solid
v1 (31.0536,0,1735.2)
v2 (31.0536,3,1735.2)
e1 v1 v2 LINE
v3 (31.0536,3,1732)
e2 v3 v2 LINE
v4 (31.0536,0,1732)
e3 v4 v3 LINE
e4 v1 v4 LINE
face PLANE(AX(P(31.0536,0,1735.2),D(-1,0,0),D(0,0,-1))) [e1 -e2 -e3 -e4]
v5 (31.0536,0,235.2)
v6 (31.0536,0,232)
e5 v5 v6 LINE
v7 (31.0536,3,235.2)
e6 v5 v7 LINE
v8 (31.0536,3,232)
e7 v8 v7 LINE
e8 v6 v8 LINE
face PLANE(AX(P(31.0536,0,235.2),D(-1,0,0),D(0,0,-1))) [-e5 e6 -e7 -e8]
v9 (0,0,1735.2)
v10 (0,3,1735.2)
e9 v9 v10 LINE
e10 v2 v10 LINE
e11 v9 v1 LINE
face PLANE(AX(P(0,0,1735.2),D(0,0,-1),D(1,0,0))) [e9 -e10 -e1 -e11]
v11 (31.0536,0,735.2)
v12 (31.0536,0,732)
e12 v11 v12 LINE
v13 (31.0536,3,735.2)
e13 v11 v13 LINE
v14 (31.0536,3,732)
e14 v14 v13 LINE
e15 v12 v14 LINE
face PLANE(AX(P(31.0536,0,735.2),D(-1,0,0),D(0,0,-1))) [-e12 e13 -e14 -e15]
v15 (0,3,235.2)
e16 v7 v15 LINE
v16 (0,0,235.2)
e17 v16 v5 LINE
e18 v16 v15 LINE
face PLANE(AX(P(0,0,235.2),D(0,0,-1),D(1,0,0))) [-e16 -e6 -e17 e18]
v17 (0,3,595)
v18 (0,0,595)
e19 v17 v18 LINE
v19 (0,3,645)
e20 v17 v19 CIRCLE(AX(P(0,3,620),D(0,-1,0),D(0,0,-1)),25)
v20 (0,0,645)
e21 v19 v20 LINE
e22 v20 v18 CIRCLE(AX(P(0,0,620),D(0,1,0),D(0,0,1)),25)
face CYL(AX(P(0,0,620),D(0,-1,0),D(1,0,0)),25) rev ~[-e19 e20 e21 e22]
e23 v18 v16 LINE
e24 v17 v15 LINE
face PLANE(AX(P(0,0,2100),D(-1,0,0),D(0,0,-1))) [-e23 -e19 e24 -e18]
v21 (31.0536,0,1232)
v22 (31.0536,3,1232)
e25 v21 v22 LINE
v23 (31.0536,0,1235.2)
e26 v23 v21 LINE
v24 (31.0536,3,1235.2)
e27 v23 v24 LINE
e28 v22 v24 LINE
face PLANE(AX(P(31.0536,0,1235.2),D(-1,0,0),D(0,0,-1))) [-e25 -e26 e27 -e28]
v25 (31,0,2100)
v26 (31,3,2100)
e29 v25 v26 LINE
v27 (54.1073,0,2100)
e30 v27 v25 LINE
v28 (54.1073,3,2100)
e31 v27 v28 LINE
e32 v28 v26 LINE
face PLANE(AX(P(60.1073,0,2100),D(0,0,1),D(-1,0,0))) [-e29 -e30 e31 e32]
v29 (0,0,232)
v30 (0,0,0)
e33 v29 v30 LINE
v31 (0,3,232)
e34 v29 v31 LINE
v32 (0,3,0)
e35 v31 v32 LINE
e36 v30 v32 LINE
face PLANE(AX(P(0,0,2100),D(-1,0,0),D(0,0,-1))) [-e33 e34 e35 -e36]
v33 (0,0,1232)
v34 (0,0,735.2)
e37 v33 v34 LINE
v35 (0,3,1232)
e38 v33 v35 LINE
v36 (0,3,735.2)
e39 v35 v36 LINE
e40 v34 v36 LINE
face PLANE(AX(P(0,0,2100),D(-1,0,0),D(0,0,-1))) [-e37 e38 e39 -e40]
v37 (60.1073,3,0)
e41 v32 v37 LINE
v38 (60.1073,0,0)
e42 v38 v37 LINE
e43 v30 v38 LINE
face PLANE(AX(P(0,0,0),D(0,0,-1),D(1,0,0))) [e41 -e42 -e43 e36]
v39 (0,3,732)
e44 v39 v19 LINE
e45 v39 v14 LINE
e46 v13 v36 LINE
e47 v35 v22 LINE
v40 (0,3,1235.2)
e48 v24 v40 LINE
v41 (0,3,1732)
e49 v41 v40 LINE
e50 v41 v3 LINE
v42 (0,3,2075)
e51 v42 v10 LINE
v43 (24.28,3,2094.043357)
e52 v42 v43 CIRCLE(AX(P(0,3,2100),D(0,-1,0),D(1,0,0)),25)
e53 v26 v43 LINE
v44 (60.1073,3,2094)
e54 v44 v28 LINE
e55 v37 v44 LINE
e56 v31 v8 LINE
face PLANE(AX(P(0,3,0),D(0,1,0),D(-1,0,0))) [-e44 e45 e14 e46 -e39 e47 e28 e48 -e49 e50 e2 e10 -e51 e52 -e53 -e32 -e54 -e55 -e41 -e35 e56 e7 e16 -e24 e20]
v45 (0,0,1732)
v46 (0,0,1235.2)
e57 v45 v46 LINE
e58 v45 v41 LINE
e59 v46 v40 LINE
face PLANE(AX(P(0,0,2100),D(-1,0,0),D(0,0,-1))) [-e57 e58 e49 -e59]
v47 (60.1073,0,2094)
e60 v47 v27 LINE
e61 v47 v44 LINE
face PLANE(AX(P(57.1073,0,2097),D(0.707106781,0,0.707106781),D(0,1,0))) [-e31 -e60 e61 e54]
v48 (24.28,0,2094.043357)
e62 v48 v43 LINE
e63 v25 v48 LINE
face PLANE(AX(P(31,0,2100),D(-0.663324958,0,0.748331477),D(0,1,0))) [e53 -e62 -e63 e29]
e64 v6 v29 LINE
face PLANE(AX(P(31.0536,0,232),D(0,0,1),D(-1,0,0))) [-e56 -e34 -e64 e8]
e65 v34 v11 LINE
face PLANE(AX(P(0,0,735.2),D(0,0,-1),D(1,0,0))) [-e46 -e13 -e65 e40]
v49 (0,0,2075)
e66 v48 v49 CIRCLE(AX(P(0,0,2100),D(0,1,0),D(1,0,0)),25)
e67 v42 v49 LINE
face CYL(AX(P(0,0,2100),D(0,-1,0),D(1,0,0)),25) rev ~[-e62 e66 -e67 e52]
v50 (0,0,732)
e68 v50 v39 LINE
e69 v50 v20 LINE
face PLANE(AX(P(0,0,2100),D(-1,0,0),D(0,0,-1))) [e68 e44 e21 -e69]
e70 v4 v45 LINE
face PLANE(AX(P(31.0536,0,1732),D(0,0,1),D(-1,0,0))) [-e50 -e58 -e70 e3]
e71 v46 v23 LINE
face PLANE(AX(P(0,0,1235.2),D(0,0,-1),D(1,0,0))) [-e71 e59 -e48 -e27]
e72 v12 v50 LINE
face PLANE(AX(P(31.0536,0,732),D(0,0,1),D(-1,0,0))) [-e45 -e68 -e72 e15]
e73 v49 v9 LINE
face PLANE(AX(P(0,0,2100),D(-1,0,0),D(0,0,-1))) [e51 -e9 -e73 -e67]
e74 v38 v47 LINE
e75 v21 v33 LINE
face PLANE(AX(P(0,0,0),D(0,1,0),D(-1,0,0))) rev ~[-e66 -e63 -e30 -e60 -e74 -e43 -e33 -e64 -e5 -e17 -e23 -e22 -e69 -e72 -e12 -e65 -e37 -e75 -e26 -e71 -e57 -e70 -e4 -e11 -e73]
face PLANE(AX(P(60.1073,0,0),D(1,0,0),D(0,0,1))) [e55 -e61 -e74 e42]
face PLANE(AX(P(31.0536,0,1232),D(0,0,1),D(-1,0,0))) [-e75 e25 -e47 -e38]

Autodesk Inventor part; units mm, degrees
ref_plane "YZ Plane" through (0, 0, 0) normal (1, 0, 0) x (0, 1, 0)
ref_plane "XZ Plane" through (0, 0, 0) normal (0, 1, 0) x (-1, 0, 0)
ref_plane "XY Plane" through (0, 0, 0) normal (0, 0, 1) x (1, 0, 0)
sketch "Sketch6" plane through (0, 0, 0) normal (0, 1, 0) x (-1, 0, 0)
  line L0 (0, 0) -> (-60.1073, 0)
  line L1 (-60.1073, 0) -> (-60.1073, 2100)
  line L2 (-60.1073, 2100) -> (0, 2100)
  line L3 (0, 2100) -> (0, 0)
  dimension "d26" = 60.1073
  dimension "d27" = 2100
extrude "Plate4" add sketch "Sketch6" along normal blind 3
sketch "Sketch9" plane through (0, 3, 0) normal (0, 1, 0) x (1, 0, 0)
  line L0 (0, -2100) -> (0, 0) projected
  line L1 (60.1073, -2100) -> (0, -2100) projected
  line L2 (60.1073, 0) -> (60.1073, -2100) projected
  line L3 (0, 0) -> (60.1073, 0) projected
  line L4 (25, -210) -> (10, -210) construction
  line L5 (10, -210) -> (10, -10) construction
  line L6 (10, -10) -> (25, -10) construction
  line L7 (25, -10) -> (25, -210) construction
  dimension "d44" = 200
  dimension "d45" = 15
  dimension "d46" = 10
  dimension "d47" = 10
mark "Mark1"
sketch "Sketch7" plane through (0, 0, 0) normal (0, -1, 0) x (1, 0, 0)
  line L0 (0, 2100) -> (60.1073, 2100) projected
  line L1 (0, 0) -> (0, 2100) projected
  line L2 (60.1073, 0) -> (0, 0) projected
  line L3 (60.1073, 2100) -> (60.1073, 0) projected
  line L4 (0, 235.2) -> (31.0536, 235.2)
  line L5 (31.0536, 235.2) -> (31.0536, 232)
  line L6 (31.0536, 232) -> (0, 232)
  line L7 (0, 232) -> (0, 235.2)
  point P0 (0, 232)
  point P1 (0, 200)
  point P2 (46.4173, 200)
  point P3 (0, 232)
  dimension "d29" = 31.0536
  dimension "d30" = 3.2
  dimension "d31" = 232
extrude "Extrusion2" cut sketch "Sketch7" against normal through all contours L4 L5 L6 L1
pattern_linear "Rectangular Pattern1" count 5 spacing 500 along (0, 0, 1) of "Extrusion2"
sketch "Sketch8" plane through (0, 0, 0) normal (0, -1, 0) x (1, 0, 0)
  line L0 (0, 1735.2) -> (0, 2100) projected
  line L1 (0, 235.2) -> (31.0536, 235.2) projected
  line L2 (31.0536, 235.2) -> (31.0536, 232) projected
  line L3 (31.0536, 232) -> (0, 232) projected
  line L4 (0, 0) -> (0, 232) projected
  line L5 (60.1073, 0) -> (0, 0) projected
  line L6 (60.1073, 2100) -> (60.1073, 0) projected
  line L7 (0, 2100) -> (60.1073, 2100) projected
  circle A0 centre (0, 620) radius 25
  line L8 (0, 1735.2) -> (31.0536, 1735.2) projected
  line L9 (31.0536, 1735.2) -> (31.0536, 1732) projected
  line L10 (31.0536, 1732) -> (0, 1732) projected
  line L11 (0, 1235.2) -> (0, 1732) projected
  line L12 (0, 1235.2) -> (31.0536, 1235.2) projected
  line L13 (31.0536, 1235.2) -> (31.0536, 1232) projected
  line L14 (31.0536, 1232) -> (0, 1232) projected
  line L15 (0, 735.2) -> (0, 1232) projected
  line L16 (0, 735.2) -> (31.0536, 735.2) projected
  line L17 (31.0536, 735.2) -> (31.0536, 732) projected
  line L18 (31.0536, 732) -> (0, 732) projected
  line L19 (0, 235.2) -> (0, 732) projected
  dimension "d37" = 50
  dimension "d38" = 620
extrude "Extrusion3" cut sketch "Sketch8" against normal through all contours L19 A0 | A0 L19
pattern_linear "Rectangular Pattern2" count 2 spacing 1480 along (0, 0, 1) of "Extrusion3"
chamfer "Corner Chamfer1" distance 6 angle 45 2 edges at (25, 1.5, 2100) (60.1073, 1.5, 2100)
equation "\"d26\" = Stringer4_deep"
equation "\"d28\" = Thickness"
equation "\"BendReliefWidth\" = Thickness"
equation "\"BendReliefDepth\" = 0.5 * Thickness"
equation "\"CornerReliefSize\" = 4 * Thickness"
equation "\"MinimumRemnant\" = 2 * Thickness"
equation "\"TransitionRadius\" = BendRadius"
equation "\"JacobiRadiusSize\" = BendRadius"
equation "\"GapSize\" = Thickness"
equation "\"Stringer4_deep\" = 60.107271"
equation "\"Thickness\" = 3"
equation "\"BendRadius\" = 5"
properties part number "BSH 0363 stringer board 4" material "09g2s"
